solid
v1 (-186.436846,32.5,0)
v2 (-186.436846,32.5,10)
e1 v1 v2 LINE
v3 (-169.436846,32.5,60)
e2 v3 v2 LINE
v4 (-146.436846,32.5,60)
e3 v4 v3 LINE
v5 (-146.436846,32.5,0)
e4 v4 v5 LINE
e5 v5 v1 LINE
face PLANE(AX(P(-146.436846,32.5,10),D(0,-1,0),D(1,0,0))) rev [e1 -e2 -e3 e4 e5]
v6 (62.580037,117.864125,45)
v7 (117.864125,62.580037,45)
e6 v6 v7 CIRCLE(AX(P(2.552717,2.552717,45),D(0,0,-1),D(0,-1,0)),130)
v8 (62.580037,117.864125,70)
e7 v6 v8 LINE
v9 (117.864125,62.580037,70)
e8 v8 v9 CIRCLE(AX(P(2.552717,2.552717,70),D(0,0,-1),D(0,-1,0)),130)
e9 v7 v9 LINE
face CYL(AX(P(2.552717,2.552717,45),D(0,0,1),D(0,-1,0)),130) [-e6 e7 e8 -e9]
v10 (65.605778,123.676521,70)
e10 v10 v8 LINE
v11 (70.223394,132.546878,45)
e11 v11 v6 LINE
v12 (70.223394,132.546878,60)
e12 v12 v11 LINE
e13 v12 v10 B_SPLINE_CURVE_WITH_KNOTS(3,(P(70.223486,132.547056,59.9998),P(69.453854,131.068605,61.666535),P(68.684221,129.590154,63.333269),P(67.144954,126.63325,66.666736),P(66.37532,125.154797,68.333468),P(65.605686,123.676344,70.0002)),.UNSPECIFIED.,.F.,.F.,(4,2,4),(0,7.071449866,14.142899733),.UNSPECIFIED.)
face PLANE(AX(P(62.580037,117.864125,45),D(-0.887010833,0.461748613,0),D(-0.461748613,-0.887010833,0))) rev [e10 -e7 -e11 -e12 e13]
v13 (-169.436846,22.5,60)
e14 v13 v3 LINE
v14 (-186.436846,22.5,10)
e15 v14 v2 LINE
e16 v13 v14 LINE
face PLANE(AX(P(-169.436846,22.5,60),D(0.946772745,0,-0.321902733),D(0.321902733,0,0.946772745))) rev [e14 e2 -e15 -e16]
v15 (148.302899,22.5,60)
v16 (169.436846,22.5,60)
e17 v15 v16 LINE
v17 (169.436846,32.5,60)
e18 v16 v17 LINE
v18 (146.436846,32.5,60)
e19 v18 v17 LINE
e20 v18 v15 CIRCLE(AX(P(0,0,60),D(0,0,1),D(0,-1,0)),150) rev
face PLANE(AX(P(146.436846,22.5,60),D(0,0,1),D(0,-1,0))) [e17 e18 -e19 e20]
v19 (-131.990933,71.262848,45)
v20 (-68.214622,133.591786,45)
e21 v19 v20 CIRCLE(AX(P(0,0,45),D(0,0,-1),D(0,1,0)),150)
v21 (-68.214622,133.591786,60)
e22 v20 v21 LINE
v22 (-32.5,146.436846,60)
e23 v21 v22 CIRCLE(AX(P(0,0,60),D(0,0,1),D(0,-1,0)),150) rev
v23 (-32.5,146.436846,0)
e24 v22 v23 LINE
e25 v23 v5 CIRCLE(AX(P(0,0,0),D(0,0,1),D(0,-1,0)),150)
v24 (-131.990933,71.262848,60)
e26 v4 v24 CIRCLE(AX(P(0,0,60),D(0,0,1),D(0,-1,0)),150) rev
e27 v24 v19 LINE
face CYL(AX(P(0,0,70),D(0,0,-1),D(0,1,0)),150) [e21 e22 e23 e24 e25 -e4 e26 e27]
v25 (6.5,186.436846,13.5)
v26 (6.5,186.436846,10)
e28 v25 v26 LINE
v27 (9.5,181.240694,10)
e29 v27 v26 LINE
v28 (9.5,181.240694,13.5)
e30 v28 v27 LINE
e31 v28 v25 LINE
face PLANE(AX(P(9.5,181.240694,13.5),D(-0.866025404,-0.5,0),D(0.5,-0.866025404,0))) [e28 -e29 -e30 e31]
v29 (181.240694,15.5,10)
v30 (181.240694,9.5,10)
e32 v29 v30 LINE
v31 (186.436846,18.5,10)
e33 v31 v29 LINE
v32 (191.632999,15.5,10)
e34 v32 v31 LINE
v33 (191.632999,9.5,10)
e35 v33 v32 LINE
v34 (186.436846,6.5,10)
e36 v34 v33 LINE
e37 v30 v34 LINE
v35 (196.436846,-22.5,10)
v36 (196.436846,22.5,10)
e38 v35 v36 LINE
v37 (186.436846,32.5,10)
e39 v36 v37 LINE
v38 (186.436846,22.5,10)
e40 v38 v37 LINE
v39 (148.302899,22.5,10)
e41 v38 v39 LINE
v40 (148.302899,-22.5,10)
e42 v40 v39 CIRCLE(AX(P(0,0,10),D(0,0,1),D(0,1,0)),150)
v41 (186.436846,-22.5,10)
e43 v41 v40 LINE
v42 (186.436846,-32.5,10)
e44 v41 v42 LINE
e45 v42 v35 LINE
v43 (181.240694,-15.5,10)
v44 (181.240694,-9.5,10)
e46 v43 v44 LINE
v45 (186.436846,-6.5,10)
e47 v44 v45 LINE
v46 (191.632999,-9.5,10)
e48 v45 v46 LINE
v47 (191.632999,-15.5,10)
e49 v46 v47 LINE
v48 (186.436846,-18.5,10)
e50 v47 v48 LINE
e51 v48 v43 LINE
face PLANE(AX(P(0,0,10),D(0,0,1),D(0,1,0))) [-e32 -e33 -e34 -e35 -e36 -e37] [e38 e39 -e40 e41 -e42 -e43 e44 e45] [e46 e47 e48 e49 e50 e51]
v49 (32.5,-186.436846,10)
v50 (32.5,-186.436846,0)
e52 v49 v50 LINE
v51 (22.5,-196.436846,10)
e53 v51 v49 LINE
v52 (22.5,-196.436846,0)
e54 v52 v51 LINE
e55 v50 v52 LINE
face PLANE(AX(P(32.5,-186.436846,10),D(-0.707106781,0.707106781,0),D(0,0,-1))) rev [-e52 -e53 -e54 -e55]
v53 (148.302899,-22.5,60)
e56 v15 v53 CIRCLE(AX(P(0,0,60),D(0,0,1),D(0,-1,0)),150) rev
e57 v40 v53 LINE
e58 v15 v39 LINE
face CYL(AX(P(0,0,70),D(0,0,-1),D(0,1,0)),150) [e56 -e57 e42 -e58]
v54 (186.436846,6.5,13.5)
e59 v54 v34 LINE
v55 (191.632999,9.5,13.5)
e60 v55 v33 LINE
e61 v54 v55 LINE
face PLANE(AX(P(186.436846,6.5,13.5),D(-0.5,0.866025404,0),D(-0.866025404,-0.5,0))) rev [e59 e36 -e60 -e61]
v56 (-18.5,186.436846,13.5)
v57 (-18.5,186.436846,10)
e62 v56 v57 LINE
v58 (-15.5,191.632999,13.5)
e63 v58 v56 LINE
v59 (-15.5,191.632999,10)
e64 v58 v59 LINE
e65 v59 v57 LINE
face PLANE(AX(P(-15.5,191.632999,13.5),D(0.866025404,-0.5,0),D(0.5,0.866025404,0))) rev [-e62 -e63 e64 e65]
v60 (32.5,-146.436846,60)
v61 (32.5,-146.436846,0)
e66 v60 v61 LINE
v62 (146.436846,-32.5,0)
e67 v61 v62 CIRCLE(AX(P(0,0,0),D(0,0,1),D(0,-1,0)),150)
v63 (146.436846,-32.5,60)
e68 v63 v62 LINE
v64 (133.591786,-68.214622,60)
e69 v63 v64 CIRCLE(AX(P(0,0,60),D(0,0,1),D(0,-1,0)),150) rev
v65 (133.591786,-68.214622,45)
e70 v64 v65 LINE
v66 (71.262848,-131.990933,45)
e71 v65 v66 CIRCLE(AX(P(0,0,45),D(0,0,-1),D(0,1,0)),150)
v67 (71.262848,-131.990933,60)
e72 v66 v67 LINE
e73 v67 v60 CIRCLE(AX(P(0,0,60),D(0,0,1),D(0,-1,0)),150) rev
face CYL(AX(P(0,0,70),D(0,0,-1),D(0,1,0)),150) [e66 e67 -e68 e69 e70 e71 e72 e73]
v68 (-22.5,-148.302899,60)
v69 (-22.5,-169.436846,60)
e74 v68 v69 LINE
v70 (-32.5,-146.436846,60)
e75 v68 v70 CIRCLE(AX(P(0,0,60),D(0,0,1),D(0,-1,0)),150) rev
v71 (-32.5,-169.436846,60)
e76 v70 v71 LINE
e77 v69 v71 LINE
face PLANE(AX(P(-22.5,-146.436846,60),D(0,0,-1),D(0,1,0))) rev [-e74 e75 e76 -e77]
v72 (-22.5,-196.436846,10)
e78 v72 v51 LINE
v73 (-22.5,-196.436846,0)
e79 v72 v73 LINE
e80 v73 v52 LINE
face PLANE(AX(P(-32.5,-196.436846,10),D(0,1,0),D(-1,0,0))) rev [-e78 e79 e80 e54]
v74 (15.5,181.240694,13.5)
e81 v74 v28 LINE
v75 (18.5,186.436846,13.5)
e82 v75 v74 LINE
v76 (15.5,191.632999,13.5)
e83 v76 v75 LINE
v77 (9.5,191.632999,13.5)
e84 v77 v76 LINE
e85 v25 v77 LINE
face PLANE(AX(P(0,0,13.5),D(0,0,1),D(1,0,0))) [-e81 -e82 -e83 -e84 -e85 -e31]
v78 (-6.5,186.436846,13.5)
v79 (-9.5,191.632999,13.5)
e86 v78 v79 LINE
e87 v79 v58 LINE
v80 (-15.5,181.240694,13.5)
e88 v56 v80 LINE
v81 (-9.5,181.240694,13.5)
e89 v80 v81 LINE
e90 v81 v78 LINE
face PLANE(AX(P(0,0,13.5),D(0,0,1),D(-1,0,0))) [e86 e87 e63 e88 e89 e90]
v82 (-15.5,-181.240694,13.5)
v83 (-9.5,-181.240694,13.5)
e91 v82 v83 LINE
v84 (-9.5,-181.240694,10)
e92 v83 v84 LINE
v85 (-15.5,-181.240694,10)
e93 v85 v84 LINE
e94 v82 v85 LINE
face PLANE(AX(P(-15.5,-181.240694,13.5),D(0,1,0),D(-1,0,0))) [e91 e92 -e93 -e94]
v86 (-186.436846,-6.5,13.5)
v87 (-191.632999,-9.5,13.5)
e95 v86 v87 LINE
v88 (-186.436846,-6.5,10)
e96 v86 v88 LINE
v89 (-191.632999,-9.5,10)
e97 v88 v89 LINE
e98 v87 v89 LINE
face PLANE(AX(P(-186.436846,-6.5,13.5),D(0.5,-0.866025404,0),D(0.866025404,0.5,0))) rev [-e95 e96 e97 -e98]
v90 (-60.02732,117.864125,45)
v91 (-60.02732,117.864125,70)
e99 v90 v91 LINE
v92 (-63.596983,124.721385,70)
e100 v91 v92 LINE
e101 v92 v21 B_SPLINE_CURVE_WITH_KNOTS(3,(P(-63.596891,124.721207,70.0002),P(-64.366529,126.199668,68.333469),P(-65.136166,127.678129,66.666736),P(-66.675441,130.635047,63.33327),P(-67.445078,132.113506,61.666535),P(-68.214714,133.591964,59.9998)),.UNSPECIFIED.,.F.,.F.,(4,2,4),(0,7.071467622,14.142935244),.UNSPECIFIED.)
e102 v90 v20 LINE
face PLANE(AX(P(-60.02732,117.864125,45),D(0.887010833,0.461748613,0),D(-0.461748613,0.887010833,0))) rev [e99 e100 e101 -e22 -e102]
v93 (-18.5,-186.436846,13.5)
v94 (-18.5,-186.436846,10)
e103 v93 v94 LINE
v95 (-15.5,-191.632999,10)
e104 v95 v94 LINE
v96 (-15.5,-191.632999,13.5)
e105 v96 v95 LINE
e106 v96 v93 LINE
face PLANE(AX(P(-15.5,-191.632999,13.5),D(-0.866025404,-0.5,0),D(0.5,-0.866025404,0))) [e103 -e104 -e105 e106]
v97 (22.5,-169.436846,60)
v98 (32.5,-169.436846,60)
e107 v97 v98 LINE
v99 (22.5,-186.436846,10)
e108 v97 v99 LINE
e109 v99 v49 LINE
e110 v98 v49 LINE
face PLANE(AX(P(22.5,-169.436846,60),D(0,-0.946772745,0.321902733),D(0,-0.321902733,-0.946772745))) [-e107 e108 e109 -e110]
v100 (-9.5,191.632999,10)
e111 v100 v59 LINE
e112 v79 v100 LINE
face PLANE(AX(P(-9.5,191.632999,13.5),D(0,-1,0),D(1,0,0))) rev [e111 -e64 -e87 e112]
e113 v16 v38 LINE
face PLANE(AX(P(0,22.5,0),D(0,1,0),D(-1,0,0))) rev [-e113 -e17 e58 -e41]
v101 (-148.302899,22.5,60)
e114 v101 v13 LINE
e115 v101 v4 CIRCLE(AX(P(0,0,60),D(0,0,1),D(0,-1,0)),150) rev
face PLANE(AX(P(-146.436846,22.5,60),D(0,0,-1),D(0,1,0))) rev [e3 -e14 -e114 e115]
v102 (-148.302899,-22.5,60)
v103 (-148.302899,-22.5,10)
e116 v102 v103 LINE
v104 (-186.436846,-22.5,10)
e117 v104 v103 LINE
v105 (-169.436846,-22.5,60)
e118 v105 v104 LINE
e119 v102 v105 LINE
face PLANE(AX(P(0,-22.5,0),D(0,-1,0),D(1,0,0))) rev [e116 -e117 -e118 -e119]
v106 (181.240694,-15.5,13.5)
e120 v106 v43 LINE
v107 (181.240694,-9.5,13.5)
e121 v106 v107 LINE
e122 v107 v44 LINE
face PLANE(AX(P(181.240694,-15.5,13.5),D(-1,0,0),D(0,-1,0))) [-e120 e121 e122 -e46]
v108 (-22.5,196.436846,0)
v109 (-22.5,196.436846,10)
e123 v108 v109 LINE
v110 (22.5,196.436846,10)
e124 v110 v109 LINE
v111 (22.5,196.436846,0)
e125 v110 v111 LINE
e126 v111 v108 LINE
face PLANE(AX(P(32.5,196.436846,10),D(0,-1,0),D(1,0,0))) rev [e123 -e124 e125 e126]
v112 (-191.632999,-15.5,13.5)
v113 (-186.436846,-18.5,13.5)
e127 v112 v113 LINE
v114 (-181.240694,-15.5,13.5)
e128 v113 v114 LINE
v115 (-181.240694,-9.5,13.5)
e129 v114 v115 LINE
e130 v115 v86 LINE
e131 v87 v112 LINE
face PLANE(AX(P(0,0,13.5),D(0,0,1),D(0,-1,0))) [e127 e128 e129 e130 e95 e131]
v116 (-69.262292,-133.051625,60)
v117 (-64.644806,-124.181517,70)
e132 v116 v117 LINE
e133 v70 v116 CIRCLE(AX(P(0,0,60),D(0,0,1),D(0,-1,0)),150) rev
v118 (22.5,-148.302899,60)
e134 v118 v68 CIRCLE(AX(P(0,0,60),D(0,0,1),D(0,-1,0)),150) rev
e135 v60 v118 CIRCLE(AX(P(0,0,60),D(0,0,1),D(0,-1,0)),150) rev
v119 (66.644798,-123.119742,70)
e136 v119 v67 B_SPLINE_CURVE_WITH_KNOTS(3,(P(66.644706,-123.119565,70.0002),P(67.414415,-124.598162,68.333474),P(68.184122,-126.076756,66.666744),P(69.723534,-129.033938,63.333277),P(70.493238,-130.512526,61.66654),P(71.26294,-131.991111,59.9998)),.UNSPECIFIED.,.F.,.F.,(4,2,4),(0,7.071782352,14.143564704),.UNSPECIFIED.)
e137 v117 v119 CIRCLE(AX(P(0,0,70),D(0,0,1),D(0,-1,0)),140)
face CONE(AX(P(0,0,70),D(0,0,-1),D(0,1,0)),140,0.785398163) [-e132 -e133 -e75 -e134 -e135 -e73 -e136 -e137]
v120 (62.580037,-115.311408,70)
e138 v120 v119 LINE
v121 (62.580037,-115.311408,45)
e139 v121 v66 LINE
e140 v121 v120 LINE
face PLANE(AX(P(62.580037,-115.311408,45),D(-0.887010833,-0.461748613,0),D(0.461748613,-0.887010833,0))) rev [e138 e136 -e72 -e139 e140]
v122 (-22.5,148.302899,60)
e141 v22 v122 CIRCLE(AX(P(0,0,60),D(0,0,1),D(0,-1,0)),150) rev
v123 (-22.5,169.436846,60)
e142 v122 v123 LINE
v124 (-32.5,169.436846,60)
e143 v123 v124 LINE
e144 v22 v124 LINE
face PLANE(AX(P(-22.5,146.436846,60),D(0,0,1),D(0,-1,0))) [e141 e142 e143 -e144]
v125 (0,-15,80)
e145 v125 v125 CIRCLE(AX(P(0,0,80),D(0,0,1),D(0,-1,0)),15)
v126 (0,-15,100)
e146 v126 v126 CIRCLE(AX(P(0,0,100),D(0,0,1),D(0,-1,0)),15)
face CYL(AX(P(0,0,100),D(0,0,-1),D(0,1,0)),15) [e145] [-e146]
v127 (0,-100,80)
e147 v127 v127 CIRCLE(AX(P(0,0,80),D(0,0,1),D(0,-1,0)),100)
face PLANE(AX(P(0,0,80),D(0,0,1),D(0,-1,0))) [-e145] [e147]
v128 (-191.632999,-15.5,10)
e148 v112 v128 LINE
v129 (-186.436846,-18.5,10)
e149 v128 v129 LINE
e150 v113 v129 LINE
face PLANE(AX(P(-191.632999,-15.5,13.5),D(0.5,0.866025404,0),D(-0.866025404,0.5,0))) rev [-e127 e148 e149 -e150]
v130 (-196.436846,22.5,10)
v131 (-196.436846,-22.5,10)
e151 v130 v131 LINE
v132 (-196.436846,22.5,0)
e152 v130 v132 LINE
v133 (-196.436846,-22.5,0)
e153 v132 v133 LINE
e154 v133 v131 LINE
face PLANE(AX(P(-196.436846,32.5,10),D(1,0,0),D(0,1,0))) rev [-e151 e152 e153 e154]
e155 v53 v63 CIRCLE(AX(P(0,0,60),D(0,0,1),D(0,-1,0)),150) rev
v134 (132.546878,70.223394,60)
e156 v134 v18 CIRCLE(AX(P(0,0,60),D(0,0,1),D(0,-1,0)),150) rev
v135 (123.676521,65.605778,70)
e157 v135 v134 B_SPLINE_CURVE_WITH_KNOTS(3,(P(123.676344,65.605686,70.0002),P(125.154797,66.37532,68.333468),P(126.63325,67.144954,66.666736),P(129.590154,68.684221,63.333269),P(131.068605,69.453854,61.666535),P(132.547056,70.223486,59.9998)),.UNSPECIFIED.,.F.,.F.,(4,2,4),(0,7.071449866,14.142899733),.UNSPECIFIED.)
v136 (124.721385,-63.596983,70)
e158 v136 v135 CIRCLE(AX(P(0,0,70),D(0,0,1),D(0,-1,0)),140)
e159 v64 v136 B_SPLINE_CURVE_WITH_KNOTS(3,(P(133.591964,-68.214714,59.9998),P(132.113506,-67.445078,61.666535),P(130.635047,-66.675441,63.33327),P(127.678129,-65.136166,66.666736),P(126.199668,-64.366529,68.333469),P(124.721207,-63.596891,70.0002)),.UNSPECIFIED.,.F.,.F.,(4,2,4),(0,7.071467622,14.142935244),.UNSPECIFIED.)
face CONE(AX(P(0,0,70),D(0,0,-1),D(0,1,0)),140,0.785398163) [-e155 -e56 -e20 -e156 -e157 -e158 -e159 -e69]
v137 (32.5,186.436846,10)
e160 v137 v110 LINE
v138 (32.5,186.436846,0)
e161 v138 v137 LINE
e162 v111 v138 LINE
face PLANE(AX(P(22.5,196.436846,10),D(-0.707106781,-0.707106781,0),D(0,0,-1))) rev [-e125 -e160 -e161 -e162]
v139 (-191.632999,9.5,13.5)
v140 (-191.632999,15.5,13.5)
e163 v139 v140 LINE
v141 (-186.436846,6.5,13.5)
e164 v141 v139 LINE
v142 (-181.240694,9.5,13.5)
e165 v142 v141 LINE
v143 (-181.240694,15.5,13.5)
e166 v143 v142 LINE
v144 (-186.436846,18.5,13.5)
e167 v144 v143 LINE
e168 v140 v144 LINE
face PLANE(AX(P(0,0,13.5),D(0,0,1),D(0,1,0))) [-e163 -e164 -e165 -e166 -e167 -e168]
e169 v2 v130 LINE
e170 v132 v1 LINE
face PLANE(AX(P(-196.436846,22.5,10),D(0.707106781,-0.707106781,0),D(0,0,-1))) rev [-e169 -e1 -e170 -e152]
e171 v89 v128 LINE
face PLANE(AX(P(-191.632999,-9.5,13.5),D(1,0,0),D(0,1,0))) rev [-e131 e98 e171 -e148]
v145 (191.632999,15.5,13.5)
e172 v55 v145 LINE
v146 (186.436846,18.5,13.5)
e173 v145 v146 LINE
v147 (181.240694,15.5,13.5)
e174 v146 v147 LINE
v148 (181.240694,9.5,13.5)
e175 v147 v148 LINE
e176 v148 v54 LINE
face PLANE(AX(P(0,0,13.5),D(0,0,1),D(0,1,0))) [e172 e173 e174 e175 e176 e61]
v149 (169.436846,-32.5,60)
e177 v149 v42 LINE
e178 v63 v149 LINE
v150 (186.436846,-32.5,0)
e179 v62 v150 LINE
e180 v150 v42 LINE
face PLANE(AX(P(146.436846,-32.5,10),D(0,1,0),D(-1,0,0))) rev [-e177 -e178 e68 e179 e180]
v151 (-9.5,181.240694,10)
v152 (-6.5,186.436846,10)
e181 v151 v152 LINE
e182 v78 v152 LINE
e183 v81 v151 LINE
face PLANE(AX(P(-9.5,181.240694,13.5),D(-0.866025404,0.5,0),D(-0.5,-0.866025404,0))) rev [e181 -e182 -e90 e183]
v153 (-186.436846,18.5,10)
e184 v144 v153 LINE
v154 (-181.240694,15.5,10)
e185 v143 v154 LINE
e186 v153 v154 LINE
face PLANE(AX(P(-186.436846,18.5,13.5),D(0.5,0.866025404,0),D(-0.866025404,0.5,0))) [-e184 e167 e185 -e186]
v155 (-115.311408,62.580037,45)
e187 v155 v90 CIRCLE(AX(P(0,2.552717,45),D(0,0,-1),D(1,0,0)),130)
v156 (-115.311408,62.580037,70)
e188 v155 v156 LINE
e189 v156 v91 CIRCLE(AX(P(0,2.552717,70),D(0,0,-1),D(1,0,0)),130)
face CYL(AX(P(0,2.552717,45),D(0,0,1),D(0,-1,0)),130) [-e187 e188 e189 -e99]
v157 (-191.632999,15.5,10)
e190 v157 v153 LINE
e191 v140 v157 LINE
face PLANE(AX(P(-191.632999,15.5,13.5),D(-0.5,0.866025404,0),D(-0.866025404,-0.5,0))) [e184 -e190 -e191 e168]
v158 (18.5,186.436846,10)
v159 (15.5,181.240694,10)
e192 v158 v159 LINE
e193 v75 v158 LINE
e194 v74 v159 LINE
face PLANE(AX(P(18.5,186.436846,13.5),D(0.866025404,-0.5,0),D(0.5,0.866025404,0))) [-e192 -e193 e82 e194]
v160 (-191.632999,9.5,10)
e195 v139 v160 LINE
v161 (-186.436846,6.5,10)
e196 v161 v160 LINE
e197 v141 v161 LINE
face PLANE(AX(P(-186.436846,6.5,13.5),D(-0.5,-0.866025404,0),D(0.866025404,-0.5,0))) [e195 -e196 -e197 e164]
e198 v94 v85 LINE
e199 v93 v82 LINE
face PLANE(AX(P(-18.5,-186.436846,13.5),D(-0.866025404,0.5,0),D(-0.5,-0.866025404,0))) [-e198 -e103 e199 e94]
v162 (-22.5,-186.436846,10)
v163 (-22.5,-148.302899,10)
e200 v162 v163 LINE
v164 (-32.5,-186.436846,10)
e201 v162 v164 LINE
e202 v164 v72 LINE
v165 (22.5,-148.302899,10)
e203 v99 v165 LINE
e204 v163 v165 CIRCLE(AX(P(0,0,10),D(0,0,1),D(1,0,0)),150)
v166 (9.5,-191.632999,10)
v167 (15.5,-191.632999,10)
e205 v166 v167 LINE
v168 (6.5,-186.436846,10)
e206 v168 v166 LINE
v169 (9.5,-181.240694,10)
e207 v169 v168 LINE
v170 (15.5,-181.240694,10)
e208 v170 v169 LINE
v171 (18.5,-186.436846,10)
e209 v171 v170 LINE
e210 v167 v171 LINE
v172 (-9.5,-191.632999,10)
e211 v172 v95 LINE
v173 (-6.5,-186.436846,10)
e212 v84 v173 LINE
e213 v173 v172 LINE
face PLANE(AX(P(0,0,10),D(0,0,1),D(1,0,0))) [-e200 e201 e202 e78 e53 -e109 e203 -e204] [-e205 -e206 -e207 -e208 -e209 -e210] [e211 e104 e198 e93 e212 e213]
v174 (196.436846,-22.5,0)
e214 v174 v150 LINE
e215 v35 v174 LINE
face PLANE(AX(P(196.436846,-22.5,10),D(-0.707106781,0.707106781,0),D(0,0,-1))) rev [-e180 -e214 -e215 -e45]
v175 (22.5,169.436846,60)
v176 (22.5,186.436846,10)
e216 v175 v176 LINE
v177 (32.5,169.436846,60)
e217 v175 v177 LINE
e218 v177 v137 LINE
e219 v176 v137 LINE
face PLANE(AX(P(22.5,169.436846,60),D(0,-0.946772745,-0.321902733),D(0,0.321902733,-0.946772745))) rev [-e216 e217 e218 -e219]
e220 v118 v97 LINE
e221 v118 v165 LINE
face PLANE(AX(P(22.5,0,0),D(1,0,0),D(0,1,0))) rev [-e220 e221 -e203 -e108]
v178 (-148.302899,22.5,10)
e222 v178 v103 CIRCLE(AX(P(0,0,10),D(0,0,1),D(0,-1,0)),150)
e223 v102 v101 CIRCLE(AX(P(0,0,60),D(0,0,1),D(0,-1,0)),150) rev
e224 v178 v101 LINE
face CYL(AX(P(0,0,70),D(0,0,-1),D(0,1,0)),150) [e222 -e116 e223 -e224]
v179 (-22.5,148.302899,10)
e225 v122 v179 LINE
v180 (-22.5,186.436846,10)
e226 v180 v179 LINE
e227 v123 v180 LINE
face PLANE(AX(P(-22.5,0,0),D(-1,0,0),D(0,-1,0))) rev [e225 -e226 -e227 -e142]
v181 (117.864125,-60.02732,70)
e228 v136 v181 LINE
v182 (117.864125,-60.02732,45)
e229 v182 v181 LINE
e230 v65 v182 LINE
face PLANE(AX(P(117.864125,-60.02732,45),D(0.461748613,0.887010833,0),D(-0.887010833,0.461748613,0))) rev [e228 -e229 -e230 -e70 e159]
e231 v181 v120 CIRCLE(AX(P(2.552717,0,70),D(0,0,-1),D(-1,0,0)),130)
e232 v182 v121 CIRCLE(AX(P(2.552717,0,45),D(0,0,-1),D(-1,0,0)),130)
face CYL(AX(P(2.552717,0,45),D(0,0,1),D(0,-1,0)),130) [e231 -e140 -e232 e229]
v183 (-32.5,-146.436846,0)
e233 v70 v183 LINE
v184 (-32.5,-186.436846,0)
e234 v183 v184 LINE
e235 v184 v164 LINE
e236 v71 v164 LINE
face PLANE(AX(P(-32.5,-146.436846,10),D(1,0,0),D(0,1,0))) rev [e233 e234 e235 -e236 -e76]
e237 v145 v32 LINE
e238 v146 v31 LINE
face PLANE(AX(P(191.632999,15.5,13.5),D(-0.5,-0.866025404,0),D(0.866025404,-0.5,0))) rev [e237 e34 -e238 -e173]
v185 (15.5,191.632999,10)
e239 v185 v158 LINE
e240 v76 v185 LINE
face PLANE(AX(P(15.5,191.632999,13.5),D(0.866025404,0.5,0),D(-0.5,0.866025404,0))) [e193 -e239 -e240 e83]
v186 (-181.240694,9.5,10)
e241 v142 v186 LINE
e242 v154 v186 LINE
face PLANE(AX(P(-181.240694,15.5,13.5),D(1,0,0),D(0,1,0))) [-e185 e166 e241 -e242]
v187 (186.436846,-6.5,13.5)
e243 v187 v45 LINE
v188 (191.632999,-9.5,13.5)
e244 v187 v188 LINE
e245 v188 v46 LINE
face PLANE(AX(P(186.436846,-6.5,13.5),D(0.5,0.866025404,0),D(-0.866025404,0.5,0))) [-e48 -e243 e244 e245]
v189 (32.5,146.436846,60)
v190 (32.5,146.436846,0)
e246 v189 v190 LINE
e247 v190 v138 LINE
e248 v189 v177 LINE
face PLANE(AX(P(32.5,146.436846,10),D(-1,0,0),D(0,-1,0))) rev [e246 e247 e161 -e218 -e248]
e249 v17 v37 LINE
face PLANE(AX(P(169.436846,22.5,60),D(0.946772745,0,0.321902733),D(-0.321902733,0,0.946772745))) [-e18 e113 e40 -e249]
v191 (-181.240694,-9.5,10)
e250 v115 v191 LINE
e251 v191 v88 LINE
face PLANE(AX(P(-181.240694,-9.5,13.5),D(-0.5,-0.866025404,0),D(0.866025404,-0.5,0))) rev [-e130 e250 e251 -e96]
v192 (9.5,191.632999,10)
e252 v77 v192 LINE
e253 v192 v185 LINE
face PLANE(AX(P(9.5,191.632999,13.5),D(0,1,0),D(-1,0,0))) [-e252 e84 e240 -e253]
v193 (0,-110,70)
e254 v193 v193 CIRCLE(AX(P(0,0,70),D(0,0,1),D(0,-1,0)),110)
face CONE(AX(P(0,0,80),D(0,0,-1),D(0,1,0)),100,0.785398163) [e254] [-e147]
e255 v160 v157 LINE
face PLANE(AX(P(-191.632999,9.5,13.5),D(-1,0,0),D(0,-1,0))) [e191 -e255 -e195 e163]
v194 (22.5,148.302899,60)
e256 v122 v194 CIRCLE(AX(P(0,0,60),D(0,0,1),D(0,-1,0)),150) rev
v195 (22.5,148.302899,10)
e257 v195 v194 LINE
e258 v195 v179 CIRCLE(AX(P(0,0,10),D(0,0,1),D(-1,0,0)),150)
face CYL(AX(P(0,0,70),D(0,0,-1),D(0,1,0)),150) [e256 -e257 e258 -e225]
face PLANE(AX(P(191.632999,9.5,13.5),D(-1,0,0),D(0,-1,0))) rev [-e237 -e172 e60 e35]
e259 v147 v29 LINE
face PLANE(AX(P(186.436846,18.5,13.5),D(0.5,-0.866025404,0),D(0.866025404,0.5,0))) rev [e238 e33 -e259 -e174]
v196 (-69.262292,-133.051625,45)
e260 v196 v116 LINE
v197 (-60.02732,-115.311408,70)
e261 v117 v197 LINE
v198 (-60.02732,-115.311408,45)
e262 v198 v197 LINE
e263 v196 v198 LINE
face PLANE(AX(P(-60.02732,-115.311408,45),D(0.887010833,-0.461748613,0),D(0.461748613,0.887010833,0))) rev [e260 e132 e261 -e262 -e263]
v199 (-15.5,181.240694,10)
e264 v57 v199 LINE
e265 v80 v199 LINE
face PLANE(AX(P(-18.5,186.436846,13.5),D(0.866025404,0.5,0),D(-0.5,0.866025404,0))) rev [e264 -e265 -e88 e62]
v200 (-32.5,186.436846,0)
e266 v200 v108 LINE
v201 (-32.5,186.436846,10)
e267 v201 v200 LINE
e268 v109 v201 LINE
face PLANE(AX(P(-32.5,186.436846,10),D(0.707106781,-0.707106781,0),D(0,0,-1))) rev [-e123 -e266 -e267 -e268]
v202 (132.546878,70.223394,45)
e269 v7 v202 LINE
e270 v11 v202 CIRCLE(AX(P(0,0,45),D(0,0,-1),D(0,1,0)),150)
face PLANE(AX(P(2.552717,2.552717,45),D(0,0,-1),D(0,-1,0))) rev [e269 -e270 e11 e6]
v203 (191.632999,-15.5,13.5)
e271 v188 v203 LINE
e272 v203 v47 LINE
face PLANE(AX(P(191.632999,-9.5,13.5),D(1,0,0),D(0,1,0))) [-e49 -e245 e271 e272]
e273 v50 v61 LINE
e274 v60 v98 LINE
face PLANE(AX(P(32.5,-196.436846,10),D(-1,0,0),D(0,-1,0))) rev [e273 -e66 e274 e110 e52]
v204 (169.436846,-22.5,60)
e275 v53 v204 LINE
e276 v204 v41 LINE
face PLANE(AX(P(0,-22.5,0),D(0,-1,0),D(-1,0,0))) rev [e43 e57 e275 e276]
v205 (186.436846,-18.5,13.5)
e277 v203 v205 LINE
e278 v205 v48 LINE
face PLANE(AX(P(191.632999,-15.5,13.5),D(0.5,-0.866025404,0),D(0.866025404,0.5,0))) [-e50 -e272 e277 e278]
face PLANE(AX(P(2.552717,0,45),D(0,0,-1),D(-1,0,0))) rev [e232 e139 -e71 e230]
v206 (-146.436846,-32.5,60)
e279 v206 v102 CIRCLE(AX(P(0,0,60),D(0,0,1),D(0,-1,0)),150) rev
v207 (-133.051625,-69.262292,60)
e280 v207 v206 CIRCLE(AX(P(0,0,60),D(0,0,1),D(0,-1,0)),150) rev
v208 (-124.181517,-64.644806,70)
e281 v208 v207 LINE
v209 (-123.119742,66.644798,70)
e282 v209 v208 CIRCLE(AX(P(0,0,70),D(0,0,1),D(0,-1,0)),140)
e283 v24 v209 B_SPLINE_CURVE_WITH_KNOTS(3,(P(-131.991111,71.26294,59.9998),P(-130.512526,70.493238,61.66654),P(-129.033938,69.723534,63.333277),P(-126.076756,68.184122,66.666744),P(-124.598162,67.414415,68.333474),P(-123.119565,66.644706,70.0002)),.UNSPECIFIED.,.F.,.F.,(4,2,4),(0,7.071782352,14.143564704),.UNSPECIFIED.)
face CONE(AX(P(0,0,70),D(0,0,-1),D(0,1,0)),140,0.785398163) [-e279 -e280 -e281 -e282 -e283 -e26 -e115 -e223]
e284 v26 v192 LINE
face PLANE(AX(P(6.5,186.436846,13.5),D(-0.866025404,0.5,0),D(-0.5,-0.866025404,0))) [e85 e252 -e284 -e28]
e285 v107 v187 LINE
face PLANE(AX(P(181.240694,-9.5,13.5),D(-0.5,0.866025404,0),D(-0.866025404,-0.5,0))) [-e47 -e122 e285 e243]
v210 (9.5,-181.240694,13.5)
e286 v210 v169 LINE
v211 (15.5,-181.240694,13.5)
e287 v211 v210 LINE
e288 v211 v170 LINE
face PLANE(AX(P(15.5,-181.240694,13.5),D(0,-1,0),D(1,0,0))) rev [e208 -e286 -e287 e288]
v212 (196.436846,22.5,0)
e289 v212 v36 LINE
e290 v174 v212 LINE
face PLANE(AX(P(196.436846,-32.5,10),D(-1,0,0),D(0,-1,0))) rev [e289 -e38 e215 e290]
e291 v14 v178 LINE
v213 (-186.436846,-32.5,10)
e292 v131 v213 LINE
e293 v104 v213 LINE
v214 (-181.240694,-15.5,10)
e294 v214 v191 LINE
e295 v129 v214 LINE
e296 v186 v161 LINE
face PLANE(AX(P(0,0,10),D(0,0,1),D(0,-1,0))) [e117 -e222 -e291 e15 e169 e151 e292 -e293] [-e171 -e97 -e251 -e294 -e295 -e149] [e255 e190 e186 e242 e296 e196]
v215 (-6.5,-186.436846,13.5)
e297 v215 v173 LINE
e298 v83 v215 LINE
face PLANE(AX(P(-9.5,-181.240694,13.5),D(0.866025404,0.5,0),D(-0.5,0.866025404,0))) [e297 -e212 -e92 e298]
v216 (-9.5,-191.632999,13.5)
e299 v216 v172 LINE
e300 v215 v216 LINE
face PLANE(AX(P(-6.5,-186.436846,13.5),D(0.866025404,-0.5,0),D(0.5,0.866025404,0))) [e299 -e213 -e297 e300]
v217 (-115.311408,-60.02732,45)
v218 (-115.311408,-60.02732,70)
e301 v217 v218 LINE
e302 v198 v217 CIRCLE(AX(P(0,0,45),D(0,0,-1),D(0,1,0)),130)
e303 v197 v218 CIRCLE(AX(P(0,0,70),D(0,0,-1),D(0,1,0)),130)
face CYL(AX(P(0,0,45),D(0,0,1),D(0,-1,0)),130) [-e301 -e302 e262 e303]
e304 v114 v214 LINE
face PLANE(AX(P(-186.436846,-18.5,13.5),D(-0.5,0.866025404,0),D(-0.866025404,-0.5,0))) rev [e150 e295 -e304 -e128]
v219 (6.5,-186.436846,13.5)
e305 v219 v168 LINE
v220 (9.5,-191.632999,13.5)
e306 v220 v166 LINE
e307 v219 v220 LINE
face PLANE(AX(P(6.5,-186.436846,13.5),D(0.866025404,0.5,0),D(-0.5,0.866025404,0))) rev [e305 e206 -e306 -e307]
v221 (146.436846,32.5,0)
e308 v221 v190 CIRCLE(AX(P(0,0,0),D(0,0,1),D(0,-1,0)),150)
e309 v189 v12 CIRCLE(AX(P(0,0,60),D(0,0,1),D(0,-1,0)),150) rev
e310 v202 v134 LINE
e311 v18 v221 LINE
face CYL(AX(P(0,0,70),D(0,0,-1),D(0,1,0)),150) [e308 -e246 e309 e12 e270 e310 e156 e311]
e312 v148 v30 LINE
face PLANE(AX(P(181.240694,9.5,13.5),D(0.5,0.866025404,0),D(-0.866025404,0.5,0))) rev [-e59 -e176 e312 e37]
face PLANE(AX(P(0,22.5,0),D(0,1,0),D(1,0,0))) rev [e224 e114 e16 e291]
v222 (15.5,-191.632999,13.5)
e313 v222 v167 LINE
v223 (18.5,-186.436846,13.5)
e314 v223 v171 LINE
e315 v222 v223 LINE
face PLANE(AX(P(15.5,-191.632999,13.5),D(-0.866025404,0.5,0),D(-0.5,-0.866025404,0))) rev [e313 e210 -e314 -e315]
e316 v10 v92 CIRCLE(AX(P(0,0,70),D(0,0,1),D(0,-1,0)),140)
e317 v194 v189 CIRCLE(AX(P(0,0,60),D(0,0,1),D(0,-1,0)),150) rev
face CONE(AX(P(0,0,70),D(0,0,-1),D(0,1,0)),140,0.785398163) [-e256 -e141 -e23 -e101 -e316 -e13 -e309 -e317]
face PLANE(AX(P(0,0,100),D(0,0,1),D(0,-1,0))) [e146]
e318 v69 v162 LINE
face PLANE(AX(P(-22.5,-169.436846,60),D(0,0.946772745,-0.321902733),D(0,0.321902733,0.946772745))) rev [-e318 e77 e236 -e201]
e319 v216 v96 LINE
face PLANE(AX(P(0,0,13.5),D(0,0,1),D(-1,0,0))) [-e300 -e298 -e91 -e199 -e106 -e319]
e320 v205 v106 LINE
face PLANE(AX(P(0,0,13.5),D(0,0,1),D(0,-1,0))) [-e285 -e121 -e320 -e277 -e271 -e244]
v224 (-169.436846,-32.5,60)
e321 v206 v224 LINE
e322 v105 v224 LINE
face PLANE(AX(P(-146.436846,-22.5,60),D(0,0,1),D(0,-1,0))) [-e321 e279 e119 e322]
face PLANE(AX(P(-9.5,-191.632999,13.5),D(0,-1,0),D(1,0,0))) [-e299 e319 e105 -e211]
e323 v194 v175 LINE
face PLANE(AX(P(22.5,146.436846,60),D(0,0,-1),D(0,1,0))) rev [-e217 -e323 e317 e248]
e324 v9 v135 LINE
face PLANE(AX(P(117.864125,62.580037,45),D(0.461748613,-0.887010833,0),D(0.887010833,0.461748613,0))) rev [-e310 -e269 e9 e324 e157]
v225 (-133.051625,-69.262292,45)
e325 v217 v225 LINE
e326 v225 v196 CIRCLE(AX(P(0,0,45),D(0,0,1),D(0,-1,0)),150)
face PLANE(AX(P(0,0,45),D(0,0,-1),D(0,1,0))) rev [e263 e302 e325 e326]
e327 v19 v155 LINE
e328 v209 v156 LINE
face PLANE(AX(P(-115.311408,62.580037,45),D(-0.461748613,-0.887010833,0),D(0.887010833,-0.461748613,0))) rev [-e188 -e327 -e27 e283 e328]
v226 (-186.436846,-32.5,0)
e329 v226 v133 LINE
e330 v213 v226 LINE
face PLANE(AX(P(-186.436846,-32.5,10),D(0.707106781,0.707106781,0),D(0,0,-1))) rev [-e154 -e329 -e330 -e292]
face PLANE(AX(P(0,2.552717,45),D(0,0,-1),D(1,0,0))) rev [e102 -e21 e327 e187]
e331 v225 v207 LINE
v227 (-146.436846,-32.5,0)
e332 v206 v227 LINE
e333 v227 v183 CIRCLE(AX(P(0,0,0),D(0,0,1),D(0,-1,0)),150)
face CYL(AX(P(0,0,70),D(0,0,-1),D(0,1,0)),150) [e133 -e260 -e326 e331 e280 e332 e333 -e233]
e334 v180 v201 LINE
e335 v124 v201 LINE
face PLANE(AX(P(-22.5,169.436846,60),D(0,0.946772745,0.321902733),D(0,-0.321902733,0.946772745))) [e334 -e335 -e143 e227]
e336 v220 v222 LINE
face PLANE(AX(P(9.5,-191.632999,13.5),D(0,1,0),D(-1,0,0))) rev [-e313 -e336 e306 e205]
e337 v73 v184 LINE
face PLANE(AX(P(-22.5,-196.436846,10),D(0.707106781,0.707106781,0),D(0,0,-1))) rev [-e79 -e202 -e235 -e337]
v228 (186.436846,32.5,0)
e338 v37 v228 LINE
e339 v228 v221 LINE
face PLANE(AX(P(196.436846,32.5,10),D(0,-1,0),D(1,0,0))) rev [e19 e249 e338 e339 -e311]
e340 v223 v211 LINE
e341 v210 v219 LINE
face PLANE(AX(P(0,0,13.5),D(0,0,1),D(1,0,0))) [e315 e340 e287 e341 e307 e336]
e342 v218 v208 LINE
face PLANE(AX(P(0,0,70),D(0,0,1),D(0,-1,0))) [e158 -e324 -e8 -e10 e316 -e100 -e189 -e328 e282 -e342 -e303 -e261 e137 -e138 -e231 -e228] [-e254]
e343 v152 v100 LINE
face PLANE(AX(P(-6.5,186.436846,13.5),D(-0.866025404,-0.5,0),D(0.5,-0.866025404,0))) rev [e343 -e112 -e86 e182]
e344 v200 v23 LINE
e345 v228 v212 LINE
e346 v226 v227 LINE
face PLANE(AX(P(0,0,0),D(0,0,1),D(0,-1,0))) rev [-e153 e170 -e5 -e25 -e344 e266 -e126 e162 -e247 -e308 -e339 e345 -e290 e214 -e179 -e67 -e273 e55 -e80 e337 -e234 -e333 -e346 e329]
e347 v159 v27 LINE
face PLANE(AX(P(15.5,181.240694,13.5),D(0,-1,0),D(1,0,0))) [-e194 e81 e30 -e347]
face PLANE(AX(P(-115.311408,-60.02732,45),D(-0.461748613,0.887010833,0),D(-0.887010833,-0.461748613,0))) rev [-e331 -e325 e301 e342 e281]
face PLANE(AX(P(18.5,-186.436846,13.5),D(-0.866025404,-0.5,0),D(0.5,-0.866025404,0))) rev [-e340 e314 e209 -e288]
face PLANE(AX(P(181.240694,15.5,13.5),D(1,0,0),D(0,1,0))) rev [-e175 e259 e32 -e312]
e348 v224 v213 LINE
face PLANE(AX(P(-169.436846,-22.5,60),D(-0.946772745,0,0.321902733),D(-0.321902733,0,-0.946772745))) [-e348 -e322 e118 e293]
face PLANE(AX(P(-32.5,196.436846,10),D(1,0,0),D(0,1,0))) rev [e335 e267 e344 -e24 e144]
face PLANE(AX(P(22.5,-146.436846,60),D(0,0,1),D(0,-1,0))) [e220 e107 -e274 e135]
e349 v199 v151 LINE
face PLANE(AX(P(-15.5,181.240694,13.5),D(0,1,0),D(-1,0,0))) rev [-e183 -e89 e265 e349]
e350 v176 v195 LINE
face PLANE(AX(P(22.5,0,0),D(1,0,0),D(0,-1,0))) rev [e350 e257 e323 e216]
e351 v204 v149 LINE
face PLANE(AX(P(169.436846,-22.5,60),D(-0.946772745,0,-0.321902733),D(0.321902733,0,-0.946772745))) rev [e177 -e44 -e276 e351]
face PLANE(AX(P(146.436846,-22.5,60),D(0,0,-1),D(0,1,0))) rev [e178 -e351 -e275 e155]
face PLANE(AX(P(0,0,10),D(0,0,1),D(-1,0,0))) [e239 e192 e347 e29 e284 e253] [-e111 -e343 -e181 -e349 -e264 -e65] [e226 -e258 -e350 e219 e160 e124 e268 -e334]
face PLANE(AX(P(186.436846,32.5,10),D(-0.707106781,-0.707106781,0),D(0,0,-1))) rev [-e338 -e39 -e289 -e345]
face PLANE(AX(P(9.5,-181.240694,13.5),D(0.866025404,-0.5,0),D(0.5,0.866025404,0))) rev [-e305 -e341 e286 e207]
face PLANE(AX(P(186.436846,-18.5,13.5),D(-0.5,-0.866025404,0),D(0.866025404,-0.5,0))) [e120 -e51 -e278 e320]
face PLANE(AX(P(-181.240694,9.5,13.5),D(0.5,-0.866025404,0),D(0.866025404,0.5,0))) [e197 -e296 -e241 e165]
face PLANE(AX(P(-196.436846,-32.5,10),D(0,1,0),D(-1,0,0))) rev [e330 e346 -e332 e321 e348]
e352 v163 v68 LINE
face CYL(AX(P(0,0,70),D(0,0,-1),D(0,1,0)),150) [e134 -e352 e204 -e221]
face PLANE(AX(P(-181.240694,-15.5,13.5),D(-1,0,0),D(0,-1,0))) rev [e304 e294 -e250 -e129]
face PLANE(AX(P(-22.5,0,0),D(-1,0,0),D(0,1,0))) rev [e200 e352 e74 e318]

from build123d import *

# Parameters (mm, degrees)
SKETCH1_R                    = 150
BOSS_EXTRUDE1_DEPTH          = 70
CHAMFER1_SIZE                = 10
BOSS_EXTRUDE2_START          = -70
BOSS_EXTRUDE2_DEPTH          = 10
CHAMFER2_SIZE                = 10
BOSS_EXTRUDE3_DEPTH          = 10
BOSS_EXTRUDE4_DEPTH          = 3.5
CIRPATTERN1_COUNT            = 4
CIRPATTERN1_COPY_1_DEPTH     = 10
CIRPATTERN1_COPY_2_DEPTH     = 10
CIRPATTERN1_COPY_3_DEPTH     = 10
CIRPATTERN1_COPY_4_DEPTH     = 3.5
CIRPATTERN1_COPY_5_DEPTH     = 3.5
CIRPATTERN1_COPY_6_DEPTH     = 3.5
CHAMFER2_OF_CIRPATTERN1_SIZE = 10
CUT_EXTRUDE1_START           = -25
CUT_EXTRUDE1_DEPTH           = 25
CIRPATTERN2_COUNT            = 4
SKETCH6_R                    = 110
BOSS_EXTRUDE5_DEPTH          = 10
CHAMFER3_SIZE                = 10
SKETCH8_R                    = 15
BOSS_EXTRUDE6_DEPTH          = 20
BODY_MOVE_COPY2_ANGLE        = 90


with BuildPart() as part:
    # Sketch1 → Boss-Extrude1 (new body)
    with BuildSketch(Plane(origin=(0, 0, 0), x_dir=(1, 0, 0), z_dir=(0, 1, 0))):
        with Locations(Location((0, 0, 0), (0, 0, 270))):
            Circle(SKETCH1_R)
    extrude(amount=BOSS_EXTRUDE1_DEPTH)

    # Chamfer1
    chamfer1_edges = [part.edges().sort_by_distance(p)[0] for p in [
        (0, 70, -150),
    ]]
    chamfer(chamfer1_edges, length=CHAMFER1_SIZE)

    # Sketch2 → Boss-Extrude2 (add)
    with BuildSketch(Plane(origin=(0, 70, 0), x_dir=(1, 0, 0), z_dir=(0, 1, 0)).offset(BOSS_EXTRUDE2_START)):
        with BuildLine():
            Line((-146.436846456, 32.5), (-196.436846456, 32.5))
            Line((-196.436846456, 32.5), (-196.436846456, -32.5))
            Line((-196.436846456, -32.5), (-146.436846456, -32.5))
            ThreePointArc((-146.436846456, -32.5), (-150, 0), (-146.436846456, 32.5))
        make_face()
    boss_extrude2 = extrude(amount=BOSS_EXTRUDE2_DEPTH)

    # Chamfer2
    chamfer2_edges = [part.edges().sort_by_distance(p)[0] for p in [
        (-196.436846456, 5, -32.5),
        (-196.436846456, 5, 32.5),
    ]]
    chamfer(chamfer2_edges, length=CHAMFER2_SIZE)

    # Sketch3 → Boss-Extrude3 (add)
    with BuildSketch(Plane.XY.offset(32.5)):
        Polygon((-146.436846456, 10), (-146.436846456, 60), (-169.436846456, 60), (-186.436846456, 10), align=None)
    boss_extrude3 = extrude(amount=-BOSS_EXTRUDE3_DEPTH)

    # Sketch4 → Boss-Extrude4 (add)
    with BuildSketch(Plane(origin=(0, 10, 0), x_dir=(1, 0, 0), z_dir=(0, 1, 0))):
        Polygon((-186.436846456, -6.5), (-191.632998879, -9.5), (-191.632998879, -15.5), (-186.436846456, -18.5), (-181.240694033, -15.5), (-181.240694033, -9.5), align=None)
    boss_extrude4 = extrude(amount=BOSS_EXTRUDE4_DEPTH)

    # Mirror1: Boss-Extrude3, Boss-Extrude4 across plane
    add(boss_extrude3.mirror(Plane.XY))
    add(boss_extrude4.mirror(Plane.XY))

    # CirPattern1: Boss-Extrude2, Boss-Extrude3, Boss-Extrude4 ×4 about axis
    cirpattern1_axis = Axis((0, 0, 0), (0, 1, 0))
    add([boss_extrude2.rotate(cirpattern1_axis, i * 360 / CIRPATTERN1_COUNT) for i in range(1, CIRPATTERN1_COUNT)])
    add([boss_extrude3.rotate(cirpattern1_axis, i * 360 / CIRPATTERN1_COUNT) for i in range(1, CIRPATTERN1_COUNT)])
    add([boss_extrude4.rotate(cirpattern1_axis, i * 360 / CIRPATTERN1_COUNT) for i in range(1, CIRPATTERN1_COUNT)])

    # CirPattern1 copy 1 sketch → CirPattern1 copy 1 (add)
    with BuildSketch(Plane(origin=(-32.5, 0, 0), x_dir=(0, 0, -1), z_dir=(-1, 0, 0))):
        Polygon((-146.436846456, -10), (-146.436846456, -60), (-169.436846456, -60), (-186.436846456, -10), align=None)
    extrude(amount=-CIRPATTERN1_COPY_1_DEPTH)

    # CirPattern1 copy 2 sketch → CirPattern1 copy 2 (add)
    with BuildSketch(Plane(origin=(0, 0, 32.5), x_dir=(-1, 0, 0), z_dir=(0, 0, 1))):
        Polygon((-146.436846456, -10), (-146.436846456, -60), (-169.436846456, -60), (-186.436846456, -10), align=None)
    extrude(amount=-CIRPATTERN1_COPY_2_DEPTH)

    # CirPattern1 copy 3 sketch → CirPattern1 copy 3 (add)
    with BuildSketch(Plane(origin=(32.5, 0, 0), x_dir=(0, 0, 1), z_dir=(1, 0, 0))):
        Polygon((-146.436846456, -10), (-146.436846456, -60), (-169.436846456, -60), (-186.436846456, -10), align=None)
    extrude(amount=-CIRPATTERN1_COPY_3_DEPTH)

    # CirPattern1 copy 4 sketch → CirPattern1 copy 4 (add)
    with BuildSketch(Plane(origin=(0, 10, 0), x_dir=(0, 0, -1), z_dir=(0, 1, 0))):
        Polygon((-186.436846456, 6.5), (-191.632998879, 9.5), (-191.632998879, 15.5), (-186.436846456, 18.5), (-181.240694033, 15.5), (-181.240694033, 9.5), align=None)
    extrude(amount=CIRPATTERN1_COPY_4_DEPTH)

    # CirPattern1 copy 5 sketch → CirPattern1 copy 5 (add)
    with BuildSketch(Plane(origin=(0, 10, 0), x_dir=(-1, 0, 0), z_dir=(0, 1, 0))):
        Polygon((-186.436846456, 6.5), (-191.632998879, 9.5), (-191.632998879, 15.5), (-186.436846456, 18.5), (-181.240694033, 15.5), (-181.240694033, 9.5), align=None)
    extrude(amount=CIRPATTERN1_COPY_5_DEPTH)

    # CirPattern1 copy 6 sketch → CirPattern1 copy 6 (add)
    with BuildSketch(Plane.ZX.offset(10)):
        Polygon((-186.436846456, 6.5), (-191.632998879, 9.5), (-191.632998879, 15.5), (-186.436846456, 18.5), (-181.240694033, 15.5), (-181.240694033, 9.5), align=None)
    extrude(amount=CIRPATTERN1_COPY_6_DEPTH)

    # Chamfer2 of CirPattern1
    chamfer2_of_cirpattern1_edges = [part.edges().sort_by_distance(p)[0] for p in [
        (-32.5, 5, 196.436846456),
        (32.5, 5, 196.436846456),
        (196.436846456, 5, 32.5),
        (196.436846456, 5, -32.5),
        (32.5, 5, -196.436846456),
        (-32.5, 5, -196.436846456),
    ]]
    chamfer(chamfer2_of_cirpattern1_edges, length=CHAMFER2_OF_CIRPATTERN1_SIZE)

    # Sketch5 → Cut-Extrude1 (cut)
    with BuildSketch(Plane(origin=(0, 70, 0), x_dir=(1, 0, 0), z_dir=(0, 1, 0)).offset(CUT_EXTRUDE1_START)):
        with BuildLine():
            Line((-115.311408313, -60.027319721), (-133.051624977, -69.262291985))
            ThreePointArc((-133.051624977, -69.262291985), (-106.066017178, -106.066017178), (-69.262291985, -133.051624977))
            Line((-69.262291985, -133.051624977), (-60.027319721, -115.311408313))
            ThreePointArc((-60.027319721, -115.311408313), (-91.923881554, -91.923881554), (-115.311408313, -60.027319721))
        make_face()
    cut_extrude1 = extrude(amount=CUT_EXTRUDE1_DEPTH, mode=Mode.SUBTRACT)

    # CirPattern2: Cut-Extrude1 ×4 about axis
    cirpattern2_axis = Axis((1.276358498, 0, -1.276358498), (0, 1, 0))
    for i in range(1, CIRPATTERN2_COUNT):
        add(cut_extrude1.rotate(cirpattern2_axis, i * 360 / CIRPATTERN2_COUNT), mode=Mode.SUBTRACT)

    # Sketch6 → Boss-Extrude5 (add)
    with BuildSketch(Plane(origin=(0, 70, 0), x_dir=(1, 0, 0), z_dir=(0, 1, 0))):
        with Locations(Location((0, 0, 0), (0, 0, 270))):
            Circle(SKETCH6_R)
    extrude(amount=BOSS_EXTRUDE5_DEPTH)

    # Chamfer3
    chamfer3_edges = [part.edges().sort_by_distance(p)[0] for p in [
        (0, 80, -110),
    ]]
    chamfer(chamfer3_edges, length=CHAMFER3_SIZE - 0.0001)  # a hair under: the kernel refuses the full size

    # Sketch8 → Boss-Extrude6 (add)
    with BuildSketch(Plane(origin=(0, 80, 0), x_dir=(1, 0, 0), z_dir=(0, 1, 0))):
        with Locations(Location((0, 0, 0), (0, 0, 270))):
            Circle(SKETCH8_R)
    extrude(amount=BOSS_EXTRUDE6_DEPTH)


with BuildPart() as part_1:
    # Body-Move/Copy1: moved
    add(part.part.moved(Location((0, -99.99999995, 0))))


with BuildPart() as part_2:
    # Body-Move/Copy2: read off the stored shape, not the designer's step
    # Body-Move/Copy2: moved
    add(part_1.part.moved(Location((0, 50, 50))).rotate(Axis((0, 0, 0), (1, 0, 0)), BODY_MOVE_COPY2_ANGLE))


with BuildPart() as part_3:
    # Body-Move/Copy3: moved
    add(part_2.part.moved(Location((0, 50, -50))))


with BuildPart() as part_4:
    # Body-Move/Copy4: moved
    add(part_3.part.moved(Location((0, 0, 20))))


with BuildPart() as part_5:
    # Body-Move/Copy6: moved
    add(part_4.part.moved(Location((0, 0, 80))))


solid = part_5.part
